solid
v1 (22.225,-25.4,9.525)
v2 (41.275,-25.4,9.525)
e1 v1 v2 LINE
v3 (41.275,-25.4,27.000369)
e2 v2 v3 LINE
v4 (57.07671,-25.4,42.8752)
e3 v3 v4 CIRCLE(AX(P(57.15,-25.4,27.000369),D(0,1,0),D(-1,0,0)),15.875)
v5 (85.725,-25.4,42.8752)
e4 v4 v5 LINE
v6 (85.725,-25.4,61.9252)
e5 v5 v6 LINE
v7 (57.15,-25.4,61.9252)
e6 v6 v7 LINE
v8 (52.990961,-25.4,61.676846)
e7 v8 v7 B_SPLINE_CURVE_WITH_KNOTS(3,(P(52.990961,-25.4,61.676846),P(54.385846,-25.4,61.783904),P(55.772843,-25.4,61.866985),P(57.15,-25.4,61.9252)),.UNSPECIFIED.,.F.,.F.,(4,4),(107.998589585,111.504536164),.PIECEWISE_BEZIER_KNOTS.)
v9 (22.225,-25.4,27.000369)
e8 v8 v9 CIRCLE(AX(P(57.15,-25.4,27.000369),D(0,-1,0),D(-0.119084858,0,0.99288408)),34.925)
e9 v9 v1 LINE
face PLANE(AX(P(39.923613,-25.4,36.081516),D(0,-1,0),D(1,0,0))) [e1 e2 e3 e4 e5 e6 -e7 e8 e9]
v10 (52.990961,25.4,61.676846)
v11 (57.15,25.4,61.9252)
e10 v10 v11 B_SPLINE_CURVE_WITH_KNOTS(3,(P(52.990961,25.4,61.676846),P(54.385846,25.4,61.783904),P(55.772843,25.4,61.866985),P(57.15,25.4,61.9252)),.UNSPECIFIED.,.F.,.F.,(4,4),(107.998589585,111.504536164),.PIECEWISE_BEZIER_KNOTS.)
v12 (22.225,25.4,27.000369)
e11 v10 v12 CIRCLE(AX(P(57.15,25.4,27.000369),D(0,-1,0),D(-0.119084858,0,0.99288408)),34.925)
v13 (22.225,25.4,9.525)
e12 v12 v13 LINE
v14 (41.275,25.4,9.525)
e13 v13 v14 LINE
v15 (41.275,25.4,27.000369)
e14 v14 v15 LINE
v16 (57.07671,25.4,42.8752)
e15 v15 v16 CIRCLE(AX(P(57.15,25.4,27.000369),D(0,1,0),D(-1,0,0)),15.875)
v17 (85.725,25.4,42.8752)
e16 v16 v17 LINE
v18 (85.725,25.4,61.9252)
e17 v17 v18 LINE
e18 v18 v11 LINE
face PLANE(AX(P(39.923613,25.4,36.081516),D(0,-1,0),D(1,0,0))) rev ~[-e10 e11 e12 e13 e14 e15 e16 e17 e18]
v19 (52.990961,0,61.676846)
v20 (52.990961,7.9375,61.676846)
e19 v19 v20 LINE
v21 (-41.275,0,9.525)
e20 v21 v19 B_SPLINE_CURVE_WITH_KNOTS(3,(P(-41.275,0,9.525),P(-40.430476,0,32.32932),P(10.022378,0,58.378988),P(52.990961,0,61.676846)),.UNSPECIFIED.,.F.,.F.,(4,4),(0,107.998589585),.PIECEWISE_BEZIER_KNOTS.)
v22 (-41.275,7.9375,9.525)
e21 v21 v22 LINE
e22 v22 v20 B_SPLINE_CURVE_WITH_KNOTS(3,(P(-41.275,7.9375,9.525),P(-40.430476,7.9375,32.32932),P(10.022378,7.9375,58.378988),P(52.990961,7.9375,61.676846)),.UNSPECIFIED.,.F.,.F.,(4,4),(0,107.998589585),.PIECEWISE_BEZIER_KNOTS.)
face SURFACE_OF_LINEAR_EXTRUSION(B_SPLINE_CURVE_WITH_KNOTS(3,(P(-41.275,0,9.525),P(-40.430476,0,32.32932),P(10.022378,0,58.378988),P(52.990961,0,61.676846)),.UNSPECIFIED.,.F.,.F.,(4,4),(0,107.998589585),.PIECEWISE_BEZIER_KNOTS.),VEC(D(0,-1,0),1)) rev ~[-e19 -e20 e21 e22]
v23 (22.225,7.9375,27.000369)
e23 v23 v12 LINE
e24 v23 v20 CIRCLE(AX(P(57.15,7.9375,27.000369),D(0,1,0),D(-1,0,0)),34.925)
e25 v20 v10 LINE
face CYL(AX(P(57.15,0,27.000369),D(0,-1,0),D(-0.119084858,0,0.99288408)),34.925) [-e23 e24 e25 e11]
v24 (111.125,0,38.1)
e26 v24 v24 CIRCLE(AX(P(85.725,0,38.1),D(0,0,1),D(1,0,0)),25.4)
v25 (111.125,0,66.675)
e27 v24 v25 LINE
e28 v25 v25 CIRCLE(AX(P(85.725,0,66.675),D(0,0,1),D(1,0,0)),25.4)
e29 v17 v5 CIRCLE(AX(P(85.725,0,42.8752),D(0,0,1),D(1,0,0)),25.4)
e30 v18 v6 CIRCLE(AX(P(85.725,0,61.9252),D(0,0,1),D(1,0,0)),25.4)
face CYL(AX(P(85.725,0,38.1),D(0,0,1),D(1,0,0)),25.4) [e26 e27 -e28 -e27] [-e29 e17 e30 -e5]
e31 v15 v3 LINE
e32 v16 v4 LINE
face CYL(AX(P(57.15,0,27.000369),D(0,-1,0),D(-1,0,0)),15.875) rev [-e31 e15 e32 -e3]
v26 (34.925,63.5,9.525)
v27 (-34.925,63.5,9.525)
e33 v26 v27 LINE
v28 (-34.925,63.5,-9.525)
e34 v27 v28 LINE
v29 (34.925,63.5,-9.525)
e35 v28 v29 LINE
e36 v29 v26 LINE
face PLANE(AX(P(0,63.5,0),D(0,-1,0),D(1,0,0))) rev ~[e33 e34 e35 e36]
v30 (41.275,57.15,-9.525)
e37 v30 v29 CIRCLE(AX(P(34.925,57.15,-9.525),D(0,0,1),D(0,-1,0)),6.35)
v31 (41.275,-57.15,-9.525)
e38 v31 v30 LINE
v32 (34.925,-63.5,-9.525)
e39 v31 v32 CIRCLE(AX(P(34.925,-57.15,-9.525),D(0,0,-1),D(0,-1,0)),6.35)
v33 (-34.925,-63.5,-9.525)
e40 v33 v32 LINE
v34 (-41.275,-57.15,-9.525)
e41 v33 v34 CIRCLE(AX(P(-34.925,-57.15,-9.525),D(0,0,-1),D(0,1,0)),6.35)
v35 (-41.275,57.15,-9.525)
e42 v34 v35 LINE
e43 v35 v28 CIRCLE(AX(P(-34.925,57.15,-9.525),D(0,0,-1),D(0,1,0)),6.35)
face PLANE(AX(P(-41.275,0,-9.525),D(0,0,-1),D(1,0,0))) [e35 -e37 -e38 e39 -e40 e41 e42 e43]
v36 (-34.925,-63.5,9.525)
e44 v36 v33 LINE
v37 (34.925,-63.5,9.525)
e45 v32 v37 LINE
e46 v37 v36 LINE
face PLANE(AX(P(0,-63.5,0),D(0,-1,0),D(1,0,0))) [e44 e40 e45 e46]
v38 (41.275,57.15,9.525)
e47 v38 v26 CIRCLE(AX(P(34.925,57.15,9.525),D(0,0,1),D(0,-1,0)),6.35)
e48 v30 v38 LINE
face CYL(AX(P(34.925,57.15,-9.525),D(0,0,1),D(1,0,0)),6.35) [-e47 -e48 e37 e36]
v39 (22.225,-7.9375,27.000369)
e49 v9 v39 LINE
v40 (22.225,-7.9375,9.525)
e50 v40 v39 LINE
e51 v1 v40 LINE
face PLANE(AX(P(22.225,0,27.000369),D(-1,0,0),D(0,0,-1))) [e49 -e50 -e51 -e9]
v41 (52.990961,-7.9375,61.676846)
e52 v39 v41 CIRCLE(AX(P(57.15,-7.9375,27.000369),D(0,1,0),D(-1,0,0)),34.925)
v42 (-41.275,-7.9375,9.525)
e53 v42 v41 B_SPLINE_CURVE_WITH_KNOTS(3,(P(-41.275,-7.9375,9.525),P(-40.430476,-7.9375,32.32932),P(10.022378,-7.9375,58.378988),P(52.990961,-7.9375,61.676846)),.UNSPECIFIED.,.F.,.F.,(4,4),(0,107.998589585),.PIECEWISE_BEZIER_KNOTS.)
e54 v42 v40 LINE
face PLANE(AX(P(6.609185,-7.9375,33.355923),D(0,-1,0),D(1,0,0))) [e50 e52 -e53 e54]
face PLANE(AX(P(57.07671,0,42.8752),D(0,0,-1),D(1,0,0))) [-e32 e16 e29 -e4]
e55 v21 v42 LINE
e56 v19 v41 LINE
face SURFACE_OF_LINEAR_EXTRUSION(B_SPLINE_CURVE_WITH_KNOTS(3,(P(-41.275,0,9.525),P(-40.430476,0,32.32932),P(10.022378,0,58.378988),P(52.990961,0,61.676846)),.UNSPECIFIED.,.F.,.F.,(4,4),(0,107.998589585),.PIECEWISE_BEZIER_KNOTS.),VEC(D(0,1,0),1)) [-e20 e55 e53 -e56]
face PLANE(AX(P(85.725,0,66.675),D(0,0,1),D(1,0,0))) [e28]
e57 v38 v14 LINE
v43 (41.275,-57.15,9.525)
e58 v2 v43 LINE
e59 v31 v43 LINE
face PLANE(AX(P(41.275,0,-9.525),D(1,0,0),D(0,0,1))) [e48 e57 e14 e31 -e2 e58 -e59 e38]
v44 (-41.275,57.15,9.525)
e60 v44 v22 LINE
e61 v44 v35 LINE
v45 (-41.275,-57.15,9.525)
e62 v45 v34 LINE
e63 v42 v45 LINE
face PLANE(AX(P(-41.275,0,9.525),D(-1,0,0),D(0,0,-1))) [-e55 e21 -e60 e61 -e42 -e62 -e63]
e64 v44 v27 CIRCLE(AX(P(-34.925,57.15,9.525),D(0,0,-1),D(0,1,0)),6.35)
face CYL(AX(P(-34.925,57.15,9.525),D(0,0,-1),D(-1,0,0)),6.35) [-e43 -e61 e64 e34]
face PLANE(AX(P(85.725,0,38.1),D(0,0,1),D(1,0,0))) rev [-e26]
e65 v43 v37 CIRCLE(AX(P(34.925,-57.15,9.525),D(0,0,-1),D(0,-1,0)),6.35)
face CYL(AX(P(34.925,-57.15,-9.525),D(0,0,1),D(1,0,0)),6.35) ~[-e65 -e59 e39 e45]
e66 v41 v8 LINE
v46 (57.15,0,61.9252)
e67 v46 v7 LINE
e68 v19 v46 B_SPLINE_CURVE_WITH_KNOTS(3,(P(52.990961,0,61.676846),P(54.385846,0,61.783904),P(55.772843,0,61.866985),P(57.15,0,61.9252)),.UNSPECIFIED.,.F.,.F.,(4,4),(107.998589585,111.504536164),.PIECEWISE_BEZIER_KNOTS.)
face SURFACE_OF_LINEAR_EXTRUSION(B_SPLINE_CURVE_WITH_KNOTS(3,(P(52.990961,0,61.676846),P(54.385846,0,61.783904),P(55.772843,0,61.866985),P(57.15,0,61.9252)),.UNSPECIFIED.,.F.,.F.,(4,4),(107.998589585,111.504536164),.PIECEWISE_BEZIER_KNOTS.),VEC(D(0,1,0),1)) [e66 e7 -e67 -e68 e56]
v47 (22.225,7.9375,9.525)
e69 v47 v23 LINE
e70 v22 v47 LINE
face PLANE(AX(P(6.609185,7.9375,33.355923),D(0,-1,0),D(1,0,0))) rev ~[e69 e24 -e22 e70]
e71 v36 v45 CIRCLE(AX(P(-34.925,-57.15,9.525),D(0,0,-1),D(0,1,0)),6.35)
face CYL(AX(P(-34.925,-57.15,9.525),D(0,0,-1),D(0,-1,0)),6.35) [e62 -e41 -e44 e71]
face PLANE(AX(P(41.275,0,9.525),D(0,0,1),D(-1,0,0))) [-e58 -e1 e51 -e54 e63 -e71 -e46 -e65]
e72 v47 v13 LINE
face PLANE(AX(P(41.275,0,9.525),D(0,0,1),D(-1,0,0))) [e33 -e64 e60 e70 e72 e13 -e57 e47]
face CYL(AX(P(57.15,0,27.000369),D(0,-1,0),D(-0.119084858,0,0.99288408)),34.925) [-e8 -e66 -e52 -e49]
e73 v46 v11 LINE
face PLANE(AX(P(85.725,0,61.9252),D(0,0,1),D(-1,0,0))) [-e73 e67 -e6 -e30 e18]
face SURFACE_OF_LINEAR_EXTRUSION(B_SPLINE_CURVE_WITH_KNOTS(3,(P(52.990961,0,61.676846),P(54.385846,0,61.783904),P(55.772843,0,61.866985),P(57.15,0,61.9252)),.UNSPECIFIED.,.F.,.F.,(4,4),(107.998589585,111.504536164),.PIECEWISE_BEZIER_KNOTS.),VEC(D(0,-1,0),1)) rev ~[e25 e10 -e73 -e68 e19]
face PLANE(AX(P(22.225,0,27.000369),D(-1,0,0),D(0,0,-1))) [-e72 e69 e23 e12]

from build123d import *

# Parameters (mm, degrees)
F1_DEPTH = 63.5
F0_W     = 25.4
F0_H     = 19.05
F2_DEPTH = 25.4
F3_DEPTH = 7.9375
F5_R     = 6.35


# Not quite as in the source:
# - a feature names something its author has since deleted; it is built from what else it names


with BuildPart() as f1:
    # F0 (on Front) → F1 (new body, symmetric)
    with BuildSketch(Plane.XZ):
        Polygon((41.275, -9.525), (41.275, 9.525), (22.225, 9.525), (-41.275, 9.525), (-41.275, -9.525), align=None)
    extrude(amount=F1_DEPTH, both=True)

    # F0 (on Front) → F2 (join, symmetric)
    with BuildSketch(Plane.XZ):
        with BuildLine():
            Line((22.225, 9.525), (41.275, 9.525))
            Line((41.275, 9.525), (41.275, 27.0003691794))
            ThreePointArc((41.275, 27.0003691794), (45.8987977719, 38.19974744), (57.0767100375, 42.8752))
            Line((57.0767100375, 42.8752), (60.325, 42.8752))
            Line((60.325, 42.8752), (60.325, 61.9252))
            Line((60.325, 61.9252), (57.15, 61.9252))
            add(Edge.make_bspline(
                [(52.9909613243, 61.6768456771), (54.385845827, 61.7839036656), (55.7728431111, 61.8669849), (57.15, 61.9252)],
                knots=[107.9985895846, 107.9985895846, 107.9985895846, 107.9985895846, 111.5045361635, 111.5045361635, 111.5045361635, 111.5045361635], degree=3))
            ThreePointArc((52.9909613243, 61.6768456771), (31.0252028644, 50.1790360873), (22.225, 27.0003691794))
            Line((22.225, 27.0003691794), (22.225, 9.525))
        make_face()
        with Locations((73.025, 52.4002)):
            Rectangle(F0_W, F0_H)
    extrude(amount=F2_DEPTH, both=True)

    # F0 (on Front) → F3 (join, symmetric)
    with BuildSketch(Plane.XZ):
        with BuildLine():
            Line((-41.275, 9.525), (22.225, 9.525))
            Line((22.225, 9.525), (22.225, 27.0003691794))
            ThreePointArc((22.225, 27.0003691794), (31.0252028644, 50.1790360873), (52.9909613243, 61.6768456771))
            add(Edge.make_bspline(
                [(-41.275, 9.525), (-40.4304762971, 32.3293201332), (10.0223776518, 58.3789883087), (52.9909613243, 61.6768456771)],
                knots=[0, 0, 0, 0, 107.9985895846, 107.9985895846, 107.9985895846, 107.9985895846], degree=3))
        make_face()
    extrude(amount=F3_DEPTH, both=True)

    # F0 (on Front) → F4 (revolve)
    with BuildSketch(Plane.XZ):
        Polygon((85.725, 61.9252), (85.725, 42.8752), (85.725, 38.1), (111.125, 38.1), (111.125, 66.675), (85.725, 66.675), align=None)
    revolve(axis=Axis((85.725, 0, 52.3875), (0, 0, 1)))

    # F5
    f5_edges = [f1.edges().sort_by_distance(p)[0] for p in [
        (41.275, -63.5, 0),
        (-41.275, -63.5, 0),
        (41.275, 63.5, 0),
        (-41.275, 63.5, 0),
    ]]
    fillet(f5_edges, radius=F5_R)


solid = f1.part
